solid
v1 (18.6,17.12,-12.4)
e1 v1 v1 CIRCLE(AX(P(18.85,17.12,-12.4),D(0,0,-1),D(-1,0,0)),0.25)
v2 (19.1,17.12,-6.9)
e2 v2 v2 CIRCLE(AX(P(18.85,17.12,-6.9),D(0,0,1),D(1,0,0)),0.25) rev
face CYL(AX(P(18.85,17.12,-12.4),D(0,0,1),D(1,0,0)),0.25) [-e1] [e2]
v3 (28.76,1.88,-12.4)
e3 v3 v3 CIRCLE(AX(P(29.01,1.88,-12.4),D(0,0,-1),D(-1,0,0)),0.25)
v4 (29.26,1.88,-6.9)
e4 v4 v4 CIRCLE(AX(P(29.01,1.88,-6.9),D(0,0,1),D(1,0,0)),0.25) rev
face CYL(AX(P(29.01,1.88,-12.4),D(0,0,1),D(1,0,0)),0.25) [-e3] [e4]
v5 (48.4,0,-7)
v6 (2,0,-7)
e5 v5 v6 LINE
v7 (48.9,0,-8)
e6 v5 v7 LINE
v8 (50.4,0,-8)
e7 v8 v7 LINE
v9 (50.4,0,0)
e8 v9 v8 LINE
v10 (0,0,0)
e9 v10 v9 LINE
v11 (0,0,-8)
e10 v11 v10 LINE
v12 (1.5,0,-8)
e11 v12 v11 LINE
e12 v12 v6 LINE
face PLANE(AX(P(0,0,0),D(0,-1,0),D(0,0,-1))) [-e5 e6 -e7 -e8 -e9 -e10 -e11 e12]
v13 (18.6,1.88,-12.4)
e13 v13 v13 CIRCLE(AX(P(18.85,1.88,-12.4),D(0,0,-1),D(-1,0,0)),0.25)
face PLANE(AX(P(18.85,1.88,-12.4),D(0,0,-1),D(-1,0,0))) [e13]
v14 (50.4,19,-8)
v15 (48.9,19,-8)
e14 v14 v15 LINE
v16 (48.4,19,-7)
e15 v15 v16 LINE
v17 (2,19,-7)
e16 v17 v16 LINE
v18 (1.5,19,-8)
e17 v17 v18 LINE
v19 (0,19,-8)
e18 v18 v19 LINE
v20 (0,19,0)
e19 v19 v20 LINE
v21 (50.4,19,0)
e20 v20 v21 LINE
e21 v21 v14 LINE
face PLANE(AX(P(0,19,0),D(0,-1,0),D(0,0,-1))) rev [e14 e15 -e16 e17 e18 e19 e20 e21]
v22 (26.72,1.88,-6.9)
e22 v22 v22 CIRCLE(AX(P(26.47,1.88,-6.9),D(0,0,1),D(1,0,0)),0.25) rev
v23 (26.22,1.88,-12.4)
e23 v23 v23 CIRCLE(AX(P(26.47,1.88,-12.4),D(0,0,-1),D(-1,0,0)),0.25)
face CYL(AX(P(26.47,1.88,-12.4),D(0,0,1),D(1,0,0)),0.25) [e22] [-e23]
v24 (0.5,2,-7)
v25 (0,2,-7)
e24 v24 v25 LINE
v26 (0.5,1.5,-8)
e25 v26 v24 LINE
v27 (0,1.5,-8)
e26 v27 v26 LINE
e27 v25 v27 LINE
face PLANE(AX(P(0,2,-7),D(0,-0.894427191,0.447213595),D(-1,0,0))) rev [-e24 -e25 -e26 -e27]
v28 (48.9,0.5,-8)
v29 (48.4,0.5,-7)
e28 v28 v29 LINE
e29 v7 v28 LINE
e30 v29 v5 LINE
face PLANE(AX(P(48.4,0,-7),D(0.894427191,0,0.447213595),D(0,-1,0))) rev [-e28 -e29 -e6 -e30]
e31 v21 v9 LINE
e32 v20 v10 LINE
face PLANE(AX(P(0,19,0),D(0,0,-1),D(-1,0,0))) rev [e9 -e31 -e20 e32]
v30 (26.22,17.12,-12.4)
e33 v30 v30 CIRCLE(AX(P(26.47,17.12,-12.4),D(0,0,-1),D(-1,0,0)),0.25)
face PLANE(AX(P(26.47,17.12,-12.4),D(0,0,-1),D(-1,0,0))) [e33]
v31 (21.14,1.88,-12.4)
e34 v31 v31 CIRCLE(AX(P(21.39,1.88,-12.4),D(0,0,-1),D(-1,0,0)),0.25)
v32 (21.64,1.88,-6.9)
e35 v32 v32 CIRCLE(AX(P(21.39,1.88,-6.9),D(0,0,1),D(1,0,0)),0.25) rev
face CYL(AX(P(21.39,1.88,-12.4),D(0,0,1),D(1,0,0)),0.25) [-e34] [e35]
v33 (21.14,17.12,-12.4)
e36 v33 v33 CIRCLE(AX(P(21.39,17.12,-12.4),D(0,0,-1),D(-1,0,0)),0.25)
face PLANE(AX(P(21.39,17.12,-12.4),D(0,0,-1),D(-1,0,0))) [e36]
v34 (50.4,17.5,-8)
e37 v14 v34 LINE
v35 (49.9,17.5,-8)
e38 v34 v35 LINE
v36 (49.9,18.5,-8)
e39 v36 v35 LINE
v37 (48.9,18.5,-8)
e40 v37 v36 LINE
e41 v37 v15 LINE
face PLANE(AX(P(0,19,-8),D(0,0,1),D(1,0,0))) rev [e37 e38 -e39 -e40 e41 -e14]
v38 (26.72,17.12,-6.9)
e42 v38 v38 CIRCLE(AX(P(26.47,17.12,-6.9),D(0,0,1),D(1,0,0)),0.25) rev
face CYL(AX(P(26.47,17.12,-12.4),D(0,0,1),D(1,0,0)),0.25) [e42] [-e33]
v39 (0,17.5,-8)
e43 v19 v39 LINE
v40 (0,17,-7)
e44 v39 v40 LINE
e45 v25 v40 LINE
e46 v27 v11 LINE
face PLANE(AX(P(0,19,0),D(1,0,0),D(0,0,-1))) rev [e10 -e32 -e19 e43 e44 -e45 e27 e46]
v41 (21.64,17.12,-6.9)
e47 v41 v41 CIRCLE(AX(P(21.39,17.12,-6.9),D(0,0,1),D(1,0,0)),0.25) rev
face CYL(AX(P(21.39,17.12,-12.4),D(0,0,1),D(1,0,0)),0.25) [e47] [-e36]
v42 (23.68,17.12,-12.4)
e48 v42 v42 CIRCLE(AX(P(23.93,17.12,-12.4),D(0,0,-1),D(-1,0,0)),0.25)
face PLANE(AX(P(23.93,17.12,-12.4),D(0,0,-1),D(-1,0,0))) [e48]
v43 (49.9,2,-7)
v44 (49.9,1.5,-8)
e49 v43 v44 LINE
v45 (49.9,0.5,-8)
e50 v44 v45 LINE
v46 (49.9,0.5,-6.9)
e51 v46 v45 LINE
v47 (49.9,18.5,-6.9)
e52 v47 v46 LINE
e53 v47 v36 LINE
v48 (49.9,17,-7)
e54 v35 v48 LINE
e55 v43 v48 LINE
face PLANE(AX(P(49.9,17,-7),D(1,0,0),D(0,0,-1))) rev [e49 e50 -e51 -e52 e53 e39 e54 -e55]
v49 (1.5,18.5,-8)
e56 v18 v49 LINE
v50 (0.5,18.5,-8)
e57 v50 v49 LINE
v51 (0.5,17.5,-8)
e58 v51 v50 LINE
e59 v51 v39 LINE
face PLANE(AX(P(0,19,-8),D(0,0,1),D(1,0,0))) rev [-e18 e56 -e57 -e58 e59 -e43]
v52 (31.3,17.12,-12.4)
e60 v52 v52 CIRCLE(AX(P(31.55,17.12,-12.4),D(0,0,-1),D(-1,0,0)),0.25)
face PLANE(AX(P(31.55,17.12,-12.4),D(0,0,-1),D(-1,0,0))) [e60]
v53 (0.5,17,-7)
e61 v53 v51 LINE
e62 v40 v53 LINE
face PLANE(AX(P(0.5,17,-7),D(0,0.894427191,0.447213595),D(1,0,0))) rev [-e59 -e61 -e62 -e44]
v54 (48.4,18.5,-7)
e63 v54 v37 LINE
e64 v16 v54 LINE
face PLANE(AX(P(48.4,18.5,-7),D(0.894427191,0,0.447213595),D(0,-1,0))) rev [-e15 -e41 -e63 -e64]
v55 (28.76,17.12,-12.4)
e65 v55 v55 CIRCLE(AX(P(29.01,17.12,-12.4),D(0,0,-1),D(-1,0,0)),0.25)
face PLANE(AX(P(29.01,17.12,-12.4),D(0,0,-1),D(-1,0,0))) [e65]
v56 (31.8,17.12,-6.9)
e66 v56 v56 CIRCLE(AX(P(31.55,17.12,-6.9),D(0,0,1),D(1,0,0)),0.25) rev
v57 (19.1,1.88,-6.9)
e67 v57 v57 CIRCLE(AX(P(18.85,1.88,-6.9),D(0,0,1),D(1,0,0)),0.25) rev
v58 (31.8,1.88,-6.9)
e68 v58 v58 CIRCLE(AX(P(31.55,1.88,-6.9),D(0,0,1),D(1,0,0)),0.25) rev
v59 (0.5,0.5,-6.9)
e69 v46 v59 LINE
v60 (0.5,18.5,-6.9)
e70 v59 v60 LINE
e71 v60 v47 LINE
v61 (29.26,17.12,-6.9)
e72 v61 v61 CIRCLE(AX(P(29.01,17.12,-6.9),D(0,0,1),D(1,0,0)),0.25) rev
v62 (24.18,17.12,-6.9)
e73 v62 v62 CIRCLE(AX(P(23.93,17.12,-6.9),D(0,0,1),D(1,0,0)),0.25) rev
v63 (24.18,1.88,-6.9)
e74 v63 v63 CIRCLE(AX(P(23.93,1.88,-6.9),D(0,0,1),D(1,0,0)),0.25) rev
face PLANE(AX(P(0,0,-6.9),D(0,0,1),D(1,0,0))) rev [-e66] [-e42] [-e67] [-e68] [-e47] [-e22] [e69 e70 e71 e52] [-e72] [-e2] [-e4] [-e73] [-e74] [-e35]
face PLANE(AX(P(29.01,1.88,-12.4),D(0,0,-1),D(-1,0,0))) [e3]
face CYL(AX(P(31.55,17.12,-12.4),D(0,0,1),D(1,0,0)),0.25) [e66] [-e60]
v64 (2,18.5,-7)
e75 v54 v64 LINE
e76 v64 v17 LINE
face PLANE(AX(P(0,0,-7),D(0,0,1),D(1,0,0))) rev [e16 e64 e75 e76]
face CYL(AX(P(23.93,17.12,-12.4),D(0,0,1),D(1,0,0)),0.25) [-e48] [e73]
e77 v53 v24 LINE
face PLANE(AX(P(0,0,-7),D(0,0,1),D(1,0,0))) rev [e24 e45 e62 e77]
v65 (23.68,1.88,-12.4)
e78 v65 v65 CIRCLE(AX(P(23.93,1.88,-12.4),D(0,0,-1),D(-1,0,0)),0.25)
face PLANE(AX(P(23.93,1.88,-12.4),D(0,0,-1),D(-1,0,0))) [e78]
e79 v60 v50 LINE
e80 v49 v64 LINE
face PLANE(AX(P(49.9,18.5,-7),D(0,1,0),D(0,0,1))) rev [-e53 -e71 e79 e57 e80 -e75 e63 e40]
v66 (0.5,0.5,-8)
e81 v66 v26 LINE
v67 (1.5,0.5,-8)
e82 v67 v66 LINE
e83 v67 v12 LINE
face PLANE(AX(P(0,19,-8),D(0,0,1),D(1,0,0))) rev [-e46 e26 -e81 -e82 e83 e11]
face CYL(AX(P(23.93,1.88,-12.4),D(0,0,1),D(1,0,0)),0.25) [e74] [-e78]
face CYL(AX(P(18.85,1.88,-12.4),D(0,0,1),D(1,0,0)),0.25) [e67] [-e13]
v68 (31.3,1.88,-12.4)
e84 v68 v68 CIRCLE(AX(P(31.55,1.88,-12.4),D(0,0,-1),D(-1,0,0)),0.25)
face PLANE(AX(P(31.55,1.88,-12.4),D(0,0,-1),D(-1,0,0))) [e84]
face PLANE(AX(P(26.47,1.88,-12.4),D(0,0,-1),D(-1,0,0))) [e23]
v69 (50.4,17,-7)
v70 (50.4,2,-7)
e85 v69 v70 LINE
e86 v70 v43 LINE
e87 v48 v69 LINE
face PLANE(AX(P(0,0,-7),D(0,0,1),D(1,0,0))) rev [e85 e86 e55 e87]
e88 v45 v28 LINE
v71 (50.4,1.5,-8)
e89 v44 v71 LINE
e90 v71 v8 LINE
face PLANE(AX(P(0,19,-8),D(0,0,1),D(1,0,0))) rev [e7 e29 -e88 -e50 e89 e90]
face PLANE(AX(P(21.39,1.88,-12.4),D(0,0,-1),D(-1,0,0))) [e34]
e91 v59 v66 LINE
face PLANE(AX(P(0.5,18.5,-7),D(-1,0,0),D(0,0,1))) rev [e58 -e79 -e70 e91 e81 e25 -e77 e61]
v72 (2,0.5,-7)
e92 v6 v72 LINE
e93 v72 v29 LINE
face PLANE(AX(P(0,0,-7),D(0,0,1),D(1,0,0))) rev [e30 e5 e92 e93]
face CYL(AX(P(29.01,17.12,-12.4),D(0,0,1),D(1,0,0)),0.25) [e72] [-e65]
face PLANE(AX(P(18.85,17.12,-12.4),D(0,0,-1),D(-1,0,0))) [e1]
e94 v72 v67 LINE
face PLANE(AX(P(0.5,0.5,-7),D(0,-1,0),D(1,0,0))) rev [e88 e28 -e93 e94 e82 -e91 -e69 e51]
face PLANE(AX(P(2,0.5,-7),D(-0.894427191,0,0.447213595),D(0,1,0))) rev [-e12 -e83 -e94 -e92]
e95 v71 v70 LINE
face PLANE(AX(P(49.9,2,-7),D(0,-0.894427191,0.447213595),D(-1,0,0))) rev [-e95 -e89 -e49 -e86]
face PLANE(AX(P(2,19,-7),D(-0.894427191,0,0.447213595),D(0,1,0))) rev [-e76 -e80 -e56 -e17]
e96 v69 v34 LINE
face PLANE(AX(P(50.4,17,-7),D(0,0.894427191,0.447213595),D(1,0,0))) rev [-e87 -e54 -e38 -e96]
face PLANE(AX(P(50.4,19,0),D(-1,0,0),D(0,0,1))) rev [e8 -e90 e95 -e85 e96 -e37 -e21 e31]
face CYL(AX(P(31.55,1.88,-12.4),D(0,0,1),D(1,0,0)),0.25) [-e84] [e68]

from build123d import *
from OCP.BRepFilletAPI import BRepFilletAPI_MakeChamfer

# Parameters (mm, degrees)
SKETCH1_W           = 50.4
SKETCH1_H           = 8
BOSS_EXTRUDE1_DEPTH = 19
CUT_EXTRUDE1_DEPTH  = 1
CHAMFER1_SIZE       = 0.5
CHAMFER1_SIZE_2     = 1
SKETCH3_W           = 49.4
SKETCH3_H           = 18
CUT_EXTRUDE2_DEPTH  = 0.1
SKETCH4_R           = 0.25
BOSS_EXTRUDE2_DEPTH = 5.5


with BuildPart() as part:
    # Sketch1 → Boss-Extrude1 (new body)
    with BuildSketch(Plane(origin=(0, 0, 0), x_dir=(1, 0, 0), z_dir=(0, 1, 0))):
        with Locations((25.2, 4)):
            Rectangle(SKETCH1_W, SKETCH1_H)
    extrude(amount=BOSS_EXTRUDE1_DEPTH)

    # Sketch2 → Cut-Extrude1 (cut)
    with BuildSketch(Plane(origin=(0, 0, -8), x_dir=(-1, 0, 0), z_dir=(0, 0, -1))):
        Polygon((-50.4, 17), (-49.9, 17), (-49.9, 18.5), (-48.4, 18.5), (-48.4, 19), (-2, 19), (-2, 18.5), (-0.5, 18.5), (-0.5, 17), (0, 17), (0, 2), (-0.5, 2), (-0.5, 0.5), (-2, 0.5), (-2, 0), (-48.4, 0), (-48.4, 0.5), (-49.9, 0.5), (-49.9, 2), (-50.4, 2), align=None)
    extrude(amount=-CUT_EXTRUDE1_DEPTH, mode=Mode.SUBTRACT)

    # Chamfer1
    chamfer1_edges_1 = [part.edges().sort_by_distance(p)[0] for p in [
        (50.15, 2, -8),
    ]]
    chamfer1_side_1 = [part.faces().sort_by_distance(p)[0] for p in [
        (50.15, 1.99, -8),
    ]]
    chamfer1_edges_2 = [part.edges().sort_by_distance(p)[0] for p in [
        (48.4, 0.25, -8),
    ]]
    chamfer1_side_2 = [part.faces().sort_by_distance(p)[0] for p in [
        (48.41, 0.25, -8),
    ]]
    chamfer1_edges_3 = [part.edges().sort_by_distance(p)[0] for p in [
        (2, 0.25, -8),
    ]]
    chamfer1_side_3 = [part.faces().sort_by_distance(p)[0] for p in [
        (1.99, 0.25, -8),
    ]]
    chamfer1_edges_4 = [part.edges().sort_by_distance(p)[0] for p in [
        (0.25, 2, -8),
    ]]
    chamfer1_side_4 = [part.faces().sort_by_distance(p)[0] for p in [
        (0.25, 2, -7.99),
    ]]
    chamfer1_edges_5 = [part.edges().sort_by_distance(p)[0] for p in [
        (2, 18.75, -8),
    ]]
    chamfer1_side_5 = [part.faces().sort_by_distance(p)[0] for p in [
        (1.99, 18.75, -8),
    ]]
    chamfer1_edges_6 = [part.edges().sort_by_distance(p)[0] for p in [
        (0.25, 17, -8),
    ]]
    chamfer1_side_6 = [part.faces().sort_by_distance(p)[0] for p in [
        (0.25, 17.01, -8),
    ]]
    chamfer1_edges_7 = [part.edges().sort_by_distance(p)[0] for p in [
        (48.4, 18.75, -8),
    ]]
    chamfer1_side_7 = [part.faces().sort_by_distance(p)[0] for p in [
        (48.41, 18.75, -8),
    ]]
    chamfer1_edges_8 = [part.edges().sort_by_distance(p)[0] for p in [
        (50.15, 17, -8),
    ]]
    chamfer1_side_8 = [part.faces().sort_by_distance(p)[0] for p in [
        (50.15, 17, -7.99),
    ]]
    chamfer1 = BRepFilletAPI_MakeChamfer(part.part.solid().wrapped)
    for e in chamfer1_edges_1:
        chamfer1.Add(CHAMFER1_SIZE - 0.0001, CHAMFER1_SIZE_2 - 0.0001, e.wrapped, chamfer1_side_1[0].wrapped)
    for e in chamfer1_edges_2:
        chamfer1.Add(CHAMFER1_SIZE - 0.0001, CHAMFER1_SIZE_2 - 0.0001, e.wrapped, chamfer1_side_2[0].wrapped)
    for e in chamfer1_edges_3:
        chamfer1.Add(CHAMFER1_SIZE - 0.0001, CHAMFER1_SIZE_2 - 0.0001, e.wrapped, chamfer1_side_3[0].wrapped)
    for e in chamfer1_edges_4:
        chamfer1.Add(CHAMFER1_SIZE_2 - 0.0001, CHAMFER1_SIZE - 0.0001, e.wrapped, chamfer1_side_4[0].wrapped)
    for e in chamfer1_edges_5:
        chamfer1.Add(CHAMFER1_SIZE - 0.0001, CHAMFER1_SIZE_2 - 0.0001, e.wrapped, chamfer1_side_5[0].wrapped)
    for e in chamfer1_edges_6:
        chamfer1.Add(CHAMFER1_SIZE - 0.0001, CHAMFER1_SIZE_2 - 0.0001, e.wrapped, chamfer1_side_6[0].wrapped)
    for e in chamfer1_edges_7:
        chamfer1.Add(CHAMFER1_SIZE - 0.0001, CHAMFER1_SIZE_2 - 0.0001, e.wrapped, chamfer1_side_7[0].wrapped)
    for e in chamfer1_edges_8:
        chamfer1.Add(CHAMFER1_SIZE_2 - 0.0001, CHAMFER1_SIZE - 0.0001, e.wrapped, chamfer1_side_8[0].wrapped)
    add(Compound.cast(chamfer1.Shape()), mode=Mode.REPLACE)  # a hair under: the kernel refuses the full size

    # Sketch3 → Cut-Extrude2 (cut)
    with BuildSketch(Plane(origin=(0, 0, -7), x_dir=(-1, 0, 0), z_dir=(0, 0, -1))):
        with Locations((-25.2, 9.5)):
            Rectangle(SKETCH3_W, SKETCH3_H)
    extrude(amount=-CUT_EXTRUDE2_DEPTH, mode=Mode.SUBTRACT)

    # Sketch4 → Boss-Extrude2 (add)
    with BuildSketch(Plane(origin=(0, 0, -6.9), x_dir=(-1, 0, 0), z_dir=(0, 0, -1))):
        with Locations(Location((-31.55, 17.12, 0), (0, 0, 180))):
            Circle(SKETCH4_R)
        with Locations(Location((-29.01, 17.12, 0), (0, 0, 180))):
            Circle(SKETCH4_R)
        with Locations(Location((-26.47, 17.12, 0), (0, 0, 180))):
            Circle(SKETCH4_R)
        with Locations(Location((-23.93, 17.12, 0), (0, 0, 180))):
            Circle(SKETCH4_R)
        with Locations(Location((-21.39, 17.12, 0), (0, 0, 180))):
            Circle(SKETCH4_R)
        with Locations(Location((-18.85, 17.12, 0), (0, 0, 180))):
            Circle(SKETCH4_R)
        with Locations(Location((-31.55, 1.88, 0), (0, 0, 180))):
            Circle(SKETCH4_R)
        with Locations(Location((-29.01, 1.88, 0), (0, 0, 180))):
            Circle(SKETCH4_R)
        with Locations(Location((-26.47, 1.88, 0), (0, 0, 180))):
            Circle(SKETCH4_R)
        with Locations(Location((-23.93, 1.88, 0), (0, 0, 180))):
            Circle(SKETCH4_R)
        with Locations(Location((-21.39, 1.88, 0), (0, 0, 180))):
            Circle(SKETCH4_R)
        with Locations(Location((-18.85, 1.88, 0), (0, 0, 180))):
            Circle(SKETCH4_R)
    extrude(amount=BOSS_EXTRUDE2_DEPTH)


solid = part.part
